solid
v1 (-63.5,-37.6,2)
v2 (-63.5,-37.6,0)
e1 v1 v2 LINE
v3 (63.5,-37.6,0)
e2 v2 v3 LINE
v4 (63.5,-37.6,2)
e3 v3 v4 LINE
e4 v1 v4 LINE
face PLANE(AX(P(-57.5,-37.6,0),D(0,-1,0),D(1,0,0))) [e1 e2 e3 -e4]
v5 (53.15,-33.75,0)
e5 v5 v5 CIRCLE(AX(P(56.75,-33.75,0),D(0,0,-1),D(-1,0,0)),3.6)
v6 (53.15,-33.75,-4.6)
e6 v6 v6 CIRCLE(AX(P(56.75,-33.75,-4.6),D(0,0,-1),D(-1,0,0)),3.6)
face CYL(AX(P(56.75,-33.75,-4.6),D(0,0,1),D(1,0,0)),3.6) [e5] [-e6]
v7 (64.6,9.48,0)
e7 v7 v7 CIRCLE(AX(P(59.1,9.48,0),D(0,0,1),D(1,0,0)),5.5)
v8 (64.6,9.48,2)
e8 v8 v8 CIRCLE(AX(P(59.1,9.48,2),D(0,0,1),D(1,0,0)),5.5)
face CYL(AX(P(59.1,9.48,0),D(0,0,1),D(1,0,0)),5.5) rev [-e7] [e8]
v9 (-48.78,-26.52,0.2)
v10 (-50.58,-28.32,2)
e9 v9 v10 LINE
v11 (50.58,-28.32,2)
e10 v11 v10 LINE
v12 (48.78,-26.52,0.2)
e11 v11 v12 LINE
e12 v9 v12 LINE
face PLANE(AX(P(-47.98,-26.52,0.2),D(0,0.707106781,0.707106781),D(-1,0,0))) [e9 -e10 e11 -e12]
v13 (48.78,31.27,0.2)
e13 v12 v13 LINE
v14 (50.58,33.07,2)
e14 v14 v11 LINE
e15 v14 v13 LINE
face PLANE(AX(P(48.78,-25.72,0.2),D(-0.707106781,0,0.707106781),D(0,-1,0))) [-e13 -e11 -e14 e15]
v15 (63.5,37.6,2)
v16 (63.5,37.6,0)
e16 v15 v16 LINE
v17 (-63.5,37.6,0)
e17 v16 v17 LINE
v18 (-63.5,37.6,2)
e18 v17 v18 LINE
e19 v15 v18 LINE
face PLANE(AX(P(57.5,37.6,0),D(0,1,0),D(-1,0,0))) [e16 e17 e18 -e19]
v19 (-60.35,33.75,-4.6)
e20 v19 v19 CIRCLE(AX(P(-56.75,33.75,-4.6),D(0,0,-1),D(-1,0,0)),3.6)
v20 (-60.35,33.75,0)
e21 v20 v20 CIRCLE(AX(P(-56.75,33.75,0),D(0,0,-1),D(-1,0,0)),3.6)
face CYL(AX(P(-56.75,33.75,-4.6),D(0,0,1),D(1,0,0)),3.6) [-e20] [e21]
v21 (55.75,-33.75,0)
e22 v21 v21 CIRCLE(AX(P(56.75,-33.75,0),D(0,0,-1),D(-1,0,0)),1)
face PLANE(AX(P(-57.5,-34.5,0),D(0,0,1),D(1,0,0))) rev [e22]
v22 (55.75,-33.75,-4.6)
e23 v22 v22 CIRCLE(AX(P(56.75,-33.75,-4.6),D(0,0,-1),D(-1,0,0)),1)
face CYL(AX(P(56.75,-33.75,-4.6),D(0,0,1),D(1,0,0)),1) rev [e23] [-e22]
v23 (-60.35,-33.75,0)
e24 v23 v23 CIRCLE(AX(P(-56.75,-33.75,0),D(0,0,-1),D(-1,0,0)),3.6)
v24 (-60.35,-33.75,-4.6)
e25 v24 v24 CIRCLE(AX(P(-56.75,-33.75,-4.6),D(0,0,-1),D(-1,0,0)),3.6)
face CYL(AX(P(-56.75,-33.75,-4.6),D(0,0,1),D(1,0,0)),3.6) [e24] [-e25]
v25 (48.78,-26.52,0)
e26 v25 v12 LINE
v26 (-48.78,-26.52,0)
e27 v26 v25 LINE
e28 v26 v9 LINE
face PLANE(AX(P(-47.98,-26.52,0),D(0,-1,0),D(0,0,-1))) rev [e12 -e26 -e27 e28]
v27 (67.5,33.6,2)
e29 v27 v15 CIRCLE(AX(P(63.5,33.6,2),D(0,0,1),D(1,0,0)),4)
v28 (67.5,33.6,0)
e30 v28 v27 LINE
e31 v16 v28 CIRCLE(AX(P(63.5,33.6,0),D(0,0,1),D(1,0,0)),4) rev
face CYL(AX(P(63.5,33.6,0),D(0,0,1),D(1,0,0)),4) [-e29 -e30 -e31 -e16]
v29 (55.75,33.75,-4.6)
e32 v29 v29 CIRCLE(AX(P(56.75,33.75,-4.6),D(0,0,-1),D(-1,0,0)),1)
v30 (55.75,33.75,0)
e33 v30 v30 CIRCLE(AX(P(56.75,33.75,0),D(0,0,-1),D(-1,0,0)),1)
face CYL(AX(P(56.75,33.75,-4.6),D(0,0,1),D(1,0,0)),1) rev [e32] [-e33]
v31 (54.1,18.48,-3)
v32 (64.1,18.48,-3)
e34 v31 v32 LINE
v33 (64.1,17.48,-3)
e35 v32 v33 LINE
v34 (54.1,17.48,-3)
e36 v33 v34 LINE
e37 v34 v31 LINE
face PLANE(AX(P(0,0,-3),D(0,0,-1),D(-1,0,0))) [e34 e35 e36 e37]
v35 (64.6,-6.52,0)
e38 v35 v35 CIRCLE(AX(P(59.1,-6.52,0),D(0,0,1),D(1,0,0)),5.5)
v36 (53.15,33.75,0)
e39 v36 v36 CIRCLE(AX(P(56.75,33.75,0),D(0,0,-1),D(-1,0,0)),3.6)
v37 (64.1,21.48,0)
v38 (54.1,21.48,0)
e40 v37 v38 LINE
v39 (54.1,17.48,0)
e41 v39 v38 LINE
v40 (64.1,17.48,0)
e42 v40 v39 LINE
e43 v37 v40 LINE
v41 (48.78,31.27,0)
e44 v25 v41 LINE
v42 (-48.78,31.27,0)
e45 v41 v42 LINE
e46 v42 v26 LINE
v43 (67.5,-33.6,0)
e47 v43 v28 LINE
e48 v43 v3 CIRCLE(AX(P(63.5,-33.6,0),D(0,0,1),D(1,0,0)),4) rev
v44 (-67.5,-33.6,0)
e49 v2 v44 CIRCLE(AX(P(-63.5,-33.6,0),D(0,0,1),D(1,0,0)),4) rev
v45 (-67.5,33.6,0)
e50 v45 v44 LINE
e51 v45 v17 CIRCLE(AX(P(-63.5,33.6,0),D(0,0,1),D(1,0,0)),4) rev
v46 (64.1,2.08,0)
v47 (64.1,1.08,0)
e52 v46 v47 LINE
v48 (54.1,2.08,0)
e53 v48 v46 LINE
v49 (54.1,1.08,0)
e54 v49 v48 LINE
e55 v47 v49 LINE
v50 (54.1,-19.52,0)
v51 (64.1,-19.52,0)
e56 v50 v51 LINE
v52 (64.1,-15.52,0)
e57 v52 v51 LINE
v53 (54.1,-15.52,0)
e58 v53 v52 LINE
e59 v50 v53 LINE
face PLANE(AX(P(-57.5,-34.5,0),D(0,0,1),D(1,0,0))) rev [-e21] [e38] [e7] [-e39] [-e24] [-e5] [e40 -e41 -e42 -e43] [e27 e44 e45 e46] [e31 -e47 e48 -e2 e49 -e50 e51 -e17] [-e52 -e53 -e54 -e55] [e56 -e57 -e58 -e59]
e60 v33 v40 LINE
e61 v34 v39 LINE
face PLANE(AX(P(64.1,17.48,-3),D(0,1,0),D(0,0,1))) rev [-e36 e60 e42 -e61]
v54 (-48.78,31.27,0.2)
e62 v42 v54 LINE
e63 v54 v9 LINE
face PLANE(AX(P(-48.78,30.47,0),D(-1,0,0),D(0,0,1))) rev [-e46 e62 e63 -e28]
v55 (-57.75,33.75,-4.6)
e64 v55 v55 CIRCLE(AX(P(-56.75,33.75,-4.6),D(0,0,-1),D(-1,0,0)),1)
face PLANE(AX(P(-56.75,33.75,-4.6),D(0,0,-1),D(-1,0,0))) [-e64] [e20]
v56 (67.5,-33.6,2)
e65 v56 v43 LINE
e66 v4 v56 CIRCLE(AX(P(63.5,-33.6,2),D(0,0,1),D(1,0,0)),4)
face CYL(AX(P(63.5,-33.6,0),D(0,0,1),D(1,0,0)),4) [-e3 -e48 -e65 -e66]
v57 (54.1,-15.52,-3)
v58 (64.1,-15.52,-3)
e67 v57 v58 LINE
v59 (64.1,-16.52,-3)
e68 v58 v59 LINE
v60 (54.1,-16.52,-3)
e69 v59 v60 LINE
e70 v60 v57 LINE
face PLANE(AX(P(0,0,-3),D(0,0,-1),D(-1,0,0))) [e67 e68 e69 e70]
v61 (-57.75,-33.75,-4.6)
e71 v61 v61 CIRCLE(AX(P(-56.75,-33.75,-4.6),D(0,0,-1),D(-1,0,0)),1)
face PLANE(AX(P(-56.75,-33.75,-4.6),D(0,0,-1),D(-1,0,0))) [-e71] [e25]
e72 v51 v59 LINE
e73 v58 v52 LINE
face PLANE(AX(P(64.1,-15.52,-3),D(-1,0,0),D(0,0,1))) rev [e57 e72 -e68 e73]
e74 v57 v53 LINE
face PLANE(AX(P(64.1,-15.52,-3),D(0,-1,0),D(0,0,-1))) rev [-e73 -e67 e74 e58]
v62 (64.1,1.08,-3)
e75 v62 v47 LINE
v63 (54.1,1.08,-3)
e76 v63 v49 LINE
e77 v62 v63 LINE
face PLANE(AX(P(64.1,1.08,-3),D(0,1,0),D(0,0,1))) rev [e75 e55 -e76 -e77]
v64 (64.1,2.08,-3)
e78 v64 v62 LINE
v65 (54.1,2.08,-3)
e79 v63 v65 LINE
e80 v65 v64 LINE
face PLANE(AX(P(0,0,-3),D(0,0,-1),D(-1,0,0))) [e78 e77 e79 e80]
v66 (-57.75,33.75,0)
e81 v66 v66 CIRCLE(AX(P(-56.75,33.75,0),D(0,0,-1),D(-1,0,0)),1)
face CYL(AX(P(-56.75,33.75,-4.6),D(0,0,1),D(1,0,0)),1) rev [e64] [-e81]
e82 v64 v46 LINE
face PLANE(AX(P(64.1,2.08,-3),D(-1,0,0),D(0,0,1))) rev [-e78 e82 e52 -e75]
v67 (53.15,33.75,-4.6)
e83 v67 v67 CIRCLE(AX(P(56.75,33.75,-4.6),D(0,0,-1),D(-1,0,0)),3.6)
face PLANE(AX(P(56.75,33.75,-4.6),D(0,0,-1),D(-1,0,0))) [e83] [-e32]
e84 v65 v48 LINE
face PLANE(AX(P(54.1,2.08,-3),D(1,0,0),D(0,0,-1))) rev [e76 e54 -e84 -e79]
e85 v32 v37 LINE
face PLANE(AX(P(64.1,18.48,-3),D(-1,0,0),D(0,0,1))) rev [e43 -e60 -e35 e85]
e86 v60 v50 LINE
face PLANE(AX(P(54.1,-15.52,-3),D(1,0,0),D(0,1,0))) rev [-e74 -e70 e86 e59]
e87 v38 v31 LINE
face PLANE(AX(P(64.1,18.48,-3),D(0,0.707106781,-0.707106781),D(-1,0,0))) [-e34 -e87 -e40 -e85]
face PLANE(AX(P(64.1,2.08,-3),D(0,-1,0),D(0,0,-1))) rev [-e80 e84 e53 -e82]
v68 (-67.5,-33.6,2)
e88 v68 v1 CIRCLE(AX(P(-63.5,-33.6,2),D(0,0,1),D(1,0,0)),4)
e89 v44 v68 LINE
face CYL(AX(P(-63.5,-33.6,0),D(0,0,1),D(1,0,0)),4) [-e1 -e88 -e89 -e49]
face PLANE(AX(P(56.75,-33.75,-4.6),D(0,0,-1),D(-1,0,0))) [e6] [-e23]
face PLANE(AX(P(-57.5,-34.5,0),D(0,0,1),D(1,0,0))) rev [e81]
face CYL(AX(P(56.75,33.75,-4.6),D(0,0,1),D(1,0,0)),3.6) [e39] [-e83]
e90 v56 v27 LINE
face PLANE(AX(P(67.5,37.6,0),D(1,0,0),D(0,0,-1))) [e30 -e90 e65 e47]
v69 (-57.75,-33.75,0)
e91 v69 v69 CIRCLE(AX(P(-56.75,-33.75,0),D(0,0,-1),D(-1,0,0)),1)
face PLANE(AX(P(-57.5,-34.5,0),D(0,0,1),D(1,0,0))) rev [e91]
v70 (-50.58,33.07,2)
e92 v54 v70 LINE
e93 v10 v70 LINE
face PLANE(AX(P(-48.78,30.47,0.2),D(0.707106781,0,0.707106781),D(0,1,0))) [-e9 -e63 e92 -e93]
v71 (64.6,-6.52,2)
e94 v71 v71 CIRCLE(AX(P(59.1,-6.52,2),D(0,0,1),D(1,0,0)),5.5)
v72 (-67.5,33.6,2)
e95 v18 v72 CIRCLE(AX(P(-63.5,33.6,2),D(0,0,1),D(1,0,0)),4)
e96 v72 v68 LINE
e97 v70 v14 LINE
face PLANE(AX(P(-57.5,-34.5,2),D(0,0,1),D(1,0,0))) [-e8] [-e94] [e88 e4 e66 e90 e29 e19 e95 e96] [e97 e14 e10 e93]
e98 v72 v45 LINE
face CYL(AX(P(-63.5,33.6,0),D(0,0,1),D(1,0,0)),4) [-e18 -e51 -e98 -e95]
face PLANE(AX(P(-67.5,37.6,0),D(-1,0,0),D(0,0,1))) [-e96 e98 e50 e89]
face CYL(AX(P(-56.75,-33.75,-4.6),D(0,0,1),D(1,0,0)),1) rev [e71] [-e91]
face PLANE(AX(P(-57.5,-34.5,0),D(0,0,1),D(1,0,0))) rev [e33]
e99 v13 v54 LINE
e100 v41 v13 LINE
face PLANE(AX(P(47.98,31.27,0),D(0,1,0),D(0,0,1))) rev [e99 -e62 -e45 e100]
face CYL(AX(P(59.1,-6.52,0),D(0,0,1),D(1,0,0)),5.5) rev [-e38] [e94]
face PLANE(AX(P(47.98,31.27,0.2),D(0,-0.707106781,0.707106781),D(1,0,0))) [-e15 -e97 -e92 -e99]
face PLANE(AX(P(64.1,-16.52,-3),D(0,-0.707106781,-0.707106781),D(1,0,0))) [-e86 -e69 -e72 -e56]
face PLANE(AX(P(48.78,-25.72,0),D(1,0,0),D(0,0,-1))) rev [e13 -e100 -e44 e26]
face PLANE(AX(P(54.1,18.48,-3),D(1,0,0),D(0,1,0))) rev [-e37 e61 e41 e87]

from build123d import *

# Parameters (mm, degrees)
SKETCH_3_W            = 95.96
SKETCH_3_H            = 56.19
EXTRUDE_2_DEPTH       = 2
SKETCH_4_W            = 97.56
SKETCH_4_H            = 57.79
SKETCH_4_W_2          = 95.96
SKETCH_4_H_2          = 56.19
CUT_EXTRUDE_1_DEPTH   = 2
SKETCH_5_R            = 3.6
SKETCH_5_R_2          = 2.4
EXTRUDE_1_DEPTH       = 4.6
EXTRUDE_START         = -2
EXTRUDE_3_DEPTH       = 2
CHAMFER_1_SIZE        = 1.8
SKETCH_8_W            = 10
SKETCH_8_H            = 75.2
EXTRUDE_3_2_DEPTH     = 2
FILLET_1_R            = 4
SKETCH_9_R            = 5.5
CUT_EXTRUDE_1_2_DEPTH = 2
SKETCH_11_R           = 2.4
SKETCH_11_R_2         = 1
EXTRUDE_4_DEPTH       = 4.6
SKETCH_14_W           = 10
SKETCH_14_H           = 1
EXTRUDE_4_2_DEPTH     = 3
CHAMFER_2_SIZE        = 3
CHAMFER_3_SIZE        = 3


with BuildPart() as part:
    # Эскиз3 → Бобышка-Вытянуть2 (new body)
    with BuildSketch(Plane.XY):
        with BuildLine():
            Line((-57.5, -37), (57.5, -37))
            ThreePointArc((57.5, -37), (59.267766953, -36.267766953), (60, -34.5))
            Line((60, -34.5), (60, 34.5))
            ThreePointArc((60, 34.5), (59.267766953, 36.267766953), (57.5, 37))
            Line((57.5, 37), (-57.5, 37))
            ThreePointArc((-57.5, 37), (-59.267766953, 36.267766953), (-60, 34.5))
            Line((-60, 34.5), (-60, -34.5))
            ThreePointArc((-60, -34.5), (-59.267766953, -36.267766953), (-57.5, -37))
        make_face()
        with Locations((0, 2.375)):
            Rectangle(SKETCH_3_W, SKETCH_3_H, mode=Mode.SUBTRACT)
    extrude(amount=EXTRUDE_2_DEPTH)

    # Эскиз4 → Cut-Extrude 1 (cut)
    with BuildSketch(Plane.XY.offset(2)):
        with Locations((0, 2.375)):
            Rectangle(SKETCH_4_W, SKETCH_4_H)
        with Locations((0, 2.375)):
            Rectangle(SKETCH_4_W_2, SKETCH_4_H_2, mode=Mode.SUBTRACT)
    extrude(amount=-CUT_EXTRUDE_1_DEPTH, mode=Mode.SUBTRACT)

    # Эскиз5 → Вытянуть-Тонкостенный1 (add)
    # profile 1 of 4: a face of its own
    with BuildSketch(Plane(origin=(0, 0, 0), x_dir=(-1, 0, 0), z_dir=(0, 0, -1))):
        with Locations((56.75, 33.75)):
            Circle(SKETCH_5_R)
        with Locations((56.75, 33.75)):
            Circle(SKETCH_5_R_2, mode=Mode.SUBTRACT)
    # profile 2 of 4: a face of its own
    with BuildSketch(Plane(origin=(0, 0, 0), x_dir=(-1, 0, 0), z_dir=(0, 0, -1))):
        with Locations((-56.75, 33.75)):
            Circle(SKETCH_5_R)
        with Locations((-56.75, 33.75)):
            Circle(SKETCH_5_R_2, mode=Mode.SUBTRACT)
    # profile 3 of 4: a face of its own
    with BuildSketch(Plane(origin=(0, 0, 0), x_dir=(-1, 0, 0), z_dir=(0, 0, -1))):
        with Locations((-56.75, -33.75)):
            Circle(SKETCH_5_R)
        with Locations((-56.75, -33.75)):
            Circle(SKETCH_5_R_2, mode=Mode.SUBTRACT)
    # profile 4 of 4: a face of its own
    with BuildSketch(Plane(origin=(0, 0, 0), x_dir=(-1, 0, 0), z_dir=(0, 0, -1))):
        with Locations((56.75, -33.75)):
            Circle(SKETCH_5_R)
        with Locations((56.75, -33.75)):
            Circle(SKETCH_5_R_2, mode=Mode.SUBTRACT)
    extrude(amount=EXTRUDE_1_DEPTH)

    # Эскиз7 → Extrude 3 (add)
    with BuildSketch(Plane.XY.offset(2).offset(EXTRUDE_START)):
        with BuildLine():
            Line((-60.6, 34.5), (-60.6, -34.5))
            ThreePointArc((-60.6, -34.5), (-59.692031022, -36.692031022), (-57.5, -37.6))
            Line((-57.5, -37.6), (57.5, -37.6))
            ThreePointArc((57.5, -37.6), (59.692031022, -36.692031022), (60.6, -34.5))
            Line((60.6, -34.5), (60.6, 34.5))
            ThreePointArc((60.6, 34.5), (59.692031022, 36.692031022), (57.5, 37.6))
            Line((57.5, 37.6), (-57.5, 37.6))
            ThreePointArc((-57.5, 37.6), (-59.692031022, 36.692031022), (-60.6, 34.5))
        make_face()
        with BuildLine():
            Line((-60, 34.5), (-60, -34.5))
            ThreePointArc((-60, -34.5), (-59.267766953, -36.267766953), (-57.5, -37))
            Line((-57.5, -37), (57.5, -37))
            ThreePointArc((57.5, -37), (59.267766953, -36.267766953), (60, -34.5))
            Line((60, -34.5), (60, 34.5))
            ThreePointArc((60, 34.5), (59.267766953, 36.267766953), (57.5, 37))
            Line((57.5, 37), (-57.5, 37))
            ThreePointArc((-57.5, 37), (-59.267766953, 36.267766953), (-60, 34.5))
        make_face(mode=Mode.SUBTRACT)
    extrude(amount=EXTRUDE_3_DEPTH)

    # Фаска1
    chamfer_1_edges = [part.edges().sort_by_distance(p)[0] for p in [
        (0, 31.27, 2),
        (-48.78, 2.375, 2),
        (0, -26.52, 2),
        (48.78, 2.375, 2),
    ]]
    chamfer(chamfer_1_edges, length=CHAMFER_1_SIZE)

    # Эскиз8 → Extrude 3 2 (add)
    with BuildSketch(Plane.XY.offset(2)):
        with Locations((62.5, 0)):
            Rectangle(SKETCH_8_W, SKETCH_8_H)
        with Locations((-62.5, 0)):
            Rectangle(SKETCH_8_W, SKETCH_8_H)
    extrude(amount=-EXTRUDE_3_2_DEPTH)

    # Скругление1
    fillet_1_edges = [part.edges().sort_by_distance(p)[0] for p in [
        (67.5, 37.6, 1),
        (67.5, -37.6, 1),
        (-67.5, -37.6, 1),
        (-67.5, 37.6, 1),
    ]]
    fillet(fillet_1_edges, radius=FILLET_1_R)

    # Эскиз9 → Cut-Extrude 1 2 (cut)
    with BuildSketch(Plane.XY.offset(2)):
        with Locations((59.1, 9.48)):
            Circle(SKETCH_9_R)
        with Locations((59.1, -6.52)):
            Circle(SKETCH_9_R)
    extrude(amount=-CUT_EXTRUDE_1_2_DEPTH, mode=Mode.SUBTRACT)

    # Эскиз11 → Extrude 4 (add)
    # profile 1 of 4: a face of its own
    with BuildSketch(Plane(origin=(0, 0, 0), x_dir=(-1, 0, 0), z_dir=(0, 0, -1))):
        with Locations((-56.75, 33.75)):
            Circle(SKETCH_11_R)
        with Locations((-56.75, 33.75)):
            Circle(SKETCH_11_R_2, mode=Mode.SUBTRACT)
    # profile 2 of 4: a face of its own
    with BuildSketch(Plane(origin=(0, 0, 0), x_dir=(-1, 0, 0), z_dir=(0, 0, -1))):
        with Locations((56.75, 33.75)):
            Circle(SKETCH_11_R)
        with Locations((56.75, 33.75)):
            Circle(SKETCH_11_R_2, mode=Mode.SUBTRACT)
    # profile 3 of 4: a face of its own
    with BuildSketch(Plane(origin=(0, 0, 0), x_dir=(-1, 0, 0), z_dir=(0, 0, -1))):
        with Locations((56.75, -33.75)):
            Circle(SKETCH_11_R)
        with Locations((56.75, -33.75)):
            Circle(SKETCH_11_R_2, mode=Mode.SUBTRACT)
    # profile 4 of 4: a face of its own
    with BuildSketch(Plane(origin=(0, 0, 0), x_dir=(-1, 0, 0), z_dir=(0, 0, -1))):
        with Locations((-56.75, -33.75)):
            Circle(SKETCH_11_R)
        with Locations((-56.75, -33.75)):
            Circle(SKETCH_11_R_2, mode=Mode.SUBTRACT)
    extrude(amount=EXTRUDE_4_DEPTH)

    # Эскиз14 → Extrude 4 2 (add)
    with BuildSketch(Plane(origin=(0, 0, 0), x_dir=(-1, 0, 0), z_dir=(0, 0, -1))):
        with Locations((-59.1, 17.98)):
            Rectangle(SKETCH_14_W, SKETCH_14_H)
        with Locations((-59.1, 1.58)):
            Rectangle(SKETCH_14_W, SKETCH_14_H)
        with Locations((-59.1, -16.02)):
            Rectangle(SKETCH_14_W, SKETCH_14_H)
    extrude(amount=EXTRUDE_4_2_DEPTH)

    # Фаска2
    chamfer_2_edges = [part.edges().sort_by_distance(p)[0] for p in [
        (59.1, 18.48, 0),
    ]]
    chamfer(chamfer_2_edges, length=CHAMFER_2_SIZE - 0.0001)  # a hair under: the kernel refuses the full size

    # Фаска3
    chamfer_3_edges = [part.edges().sort_by_distance(p)[0] for p in [
        (59.1, -16.52, 0),
    ]]
    chamfer(chamfer_3_edges, length=CHAMFER_3_SIZE - 0.0001)  # a hair under: the kernel refuses the full size


solid = part.part
